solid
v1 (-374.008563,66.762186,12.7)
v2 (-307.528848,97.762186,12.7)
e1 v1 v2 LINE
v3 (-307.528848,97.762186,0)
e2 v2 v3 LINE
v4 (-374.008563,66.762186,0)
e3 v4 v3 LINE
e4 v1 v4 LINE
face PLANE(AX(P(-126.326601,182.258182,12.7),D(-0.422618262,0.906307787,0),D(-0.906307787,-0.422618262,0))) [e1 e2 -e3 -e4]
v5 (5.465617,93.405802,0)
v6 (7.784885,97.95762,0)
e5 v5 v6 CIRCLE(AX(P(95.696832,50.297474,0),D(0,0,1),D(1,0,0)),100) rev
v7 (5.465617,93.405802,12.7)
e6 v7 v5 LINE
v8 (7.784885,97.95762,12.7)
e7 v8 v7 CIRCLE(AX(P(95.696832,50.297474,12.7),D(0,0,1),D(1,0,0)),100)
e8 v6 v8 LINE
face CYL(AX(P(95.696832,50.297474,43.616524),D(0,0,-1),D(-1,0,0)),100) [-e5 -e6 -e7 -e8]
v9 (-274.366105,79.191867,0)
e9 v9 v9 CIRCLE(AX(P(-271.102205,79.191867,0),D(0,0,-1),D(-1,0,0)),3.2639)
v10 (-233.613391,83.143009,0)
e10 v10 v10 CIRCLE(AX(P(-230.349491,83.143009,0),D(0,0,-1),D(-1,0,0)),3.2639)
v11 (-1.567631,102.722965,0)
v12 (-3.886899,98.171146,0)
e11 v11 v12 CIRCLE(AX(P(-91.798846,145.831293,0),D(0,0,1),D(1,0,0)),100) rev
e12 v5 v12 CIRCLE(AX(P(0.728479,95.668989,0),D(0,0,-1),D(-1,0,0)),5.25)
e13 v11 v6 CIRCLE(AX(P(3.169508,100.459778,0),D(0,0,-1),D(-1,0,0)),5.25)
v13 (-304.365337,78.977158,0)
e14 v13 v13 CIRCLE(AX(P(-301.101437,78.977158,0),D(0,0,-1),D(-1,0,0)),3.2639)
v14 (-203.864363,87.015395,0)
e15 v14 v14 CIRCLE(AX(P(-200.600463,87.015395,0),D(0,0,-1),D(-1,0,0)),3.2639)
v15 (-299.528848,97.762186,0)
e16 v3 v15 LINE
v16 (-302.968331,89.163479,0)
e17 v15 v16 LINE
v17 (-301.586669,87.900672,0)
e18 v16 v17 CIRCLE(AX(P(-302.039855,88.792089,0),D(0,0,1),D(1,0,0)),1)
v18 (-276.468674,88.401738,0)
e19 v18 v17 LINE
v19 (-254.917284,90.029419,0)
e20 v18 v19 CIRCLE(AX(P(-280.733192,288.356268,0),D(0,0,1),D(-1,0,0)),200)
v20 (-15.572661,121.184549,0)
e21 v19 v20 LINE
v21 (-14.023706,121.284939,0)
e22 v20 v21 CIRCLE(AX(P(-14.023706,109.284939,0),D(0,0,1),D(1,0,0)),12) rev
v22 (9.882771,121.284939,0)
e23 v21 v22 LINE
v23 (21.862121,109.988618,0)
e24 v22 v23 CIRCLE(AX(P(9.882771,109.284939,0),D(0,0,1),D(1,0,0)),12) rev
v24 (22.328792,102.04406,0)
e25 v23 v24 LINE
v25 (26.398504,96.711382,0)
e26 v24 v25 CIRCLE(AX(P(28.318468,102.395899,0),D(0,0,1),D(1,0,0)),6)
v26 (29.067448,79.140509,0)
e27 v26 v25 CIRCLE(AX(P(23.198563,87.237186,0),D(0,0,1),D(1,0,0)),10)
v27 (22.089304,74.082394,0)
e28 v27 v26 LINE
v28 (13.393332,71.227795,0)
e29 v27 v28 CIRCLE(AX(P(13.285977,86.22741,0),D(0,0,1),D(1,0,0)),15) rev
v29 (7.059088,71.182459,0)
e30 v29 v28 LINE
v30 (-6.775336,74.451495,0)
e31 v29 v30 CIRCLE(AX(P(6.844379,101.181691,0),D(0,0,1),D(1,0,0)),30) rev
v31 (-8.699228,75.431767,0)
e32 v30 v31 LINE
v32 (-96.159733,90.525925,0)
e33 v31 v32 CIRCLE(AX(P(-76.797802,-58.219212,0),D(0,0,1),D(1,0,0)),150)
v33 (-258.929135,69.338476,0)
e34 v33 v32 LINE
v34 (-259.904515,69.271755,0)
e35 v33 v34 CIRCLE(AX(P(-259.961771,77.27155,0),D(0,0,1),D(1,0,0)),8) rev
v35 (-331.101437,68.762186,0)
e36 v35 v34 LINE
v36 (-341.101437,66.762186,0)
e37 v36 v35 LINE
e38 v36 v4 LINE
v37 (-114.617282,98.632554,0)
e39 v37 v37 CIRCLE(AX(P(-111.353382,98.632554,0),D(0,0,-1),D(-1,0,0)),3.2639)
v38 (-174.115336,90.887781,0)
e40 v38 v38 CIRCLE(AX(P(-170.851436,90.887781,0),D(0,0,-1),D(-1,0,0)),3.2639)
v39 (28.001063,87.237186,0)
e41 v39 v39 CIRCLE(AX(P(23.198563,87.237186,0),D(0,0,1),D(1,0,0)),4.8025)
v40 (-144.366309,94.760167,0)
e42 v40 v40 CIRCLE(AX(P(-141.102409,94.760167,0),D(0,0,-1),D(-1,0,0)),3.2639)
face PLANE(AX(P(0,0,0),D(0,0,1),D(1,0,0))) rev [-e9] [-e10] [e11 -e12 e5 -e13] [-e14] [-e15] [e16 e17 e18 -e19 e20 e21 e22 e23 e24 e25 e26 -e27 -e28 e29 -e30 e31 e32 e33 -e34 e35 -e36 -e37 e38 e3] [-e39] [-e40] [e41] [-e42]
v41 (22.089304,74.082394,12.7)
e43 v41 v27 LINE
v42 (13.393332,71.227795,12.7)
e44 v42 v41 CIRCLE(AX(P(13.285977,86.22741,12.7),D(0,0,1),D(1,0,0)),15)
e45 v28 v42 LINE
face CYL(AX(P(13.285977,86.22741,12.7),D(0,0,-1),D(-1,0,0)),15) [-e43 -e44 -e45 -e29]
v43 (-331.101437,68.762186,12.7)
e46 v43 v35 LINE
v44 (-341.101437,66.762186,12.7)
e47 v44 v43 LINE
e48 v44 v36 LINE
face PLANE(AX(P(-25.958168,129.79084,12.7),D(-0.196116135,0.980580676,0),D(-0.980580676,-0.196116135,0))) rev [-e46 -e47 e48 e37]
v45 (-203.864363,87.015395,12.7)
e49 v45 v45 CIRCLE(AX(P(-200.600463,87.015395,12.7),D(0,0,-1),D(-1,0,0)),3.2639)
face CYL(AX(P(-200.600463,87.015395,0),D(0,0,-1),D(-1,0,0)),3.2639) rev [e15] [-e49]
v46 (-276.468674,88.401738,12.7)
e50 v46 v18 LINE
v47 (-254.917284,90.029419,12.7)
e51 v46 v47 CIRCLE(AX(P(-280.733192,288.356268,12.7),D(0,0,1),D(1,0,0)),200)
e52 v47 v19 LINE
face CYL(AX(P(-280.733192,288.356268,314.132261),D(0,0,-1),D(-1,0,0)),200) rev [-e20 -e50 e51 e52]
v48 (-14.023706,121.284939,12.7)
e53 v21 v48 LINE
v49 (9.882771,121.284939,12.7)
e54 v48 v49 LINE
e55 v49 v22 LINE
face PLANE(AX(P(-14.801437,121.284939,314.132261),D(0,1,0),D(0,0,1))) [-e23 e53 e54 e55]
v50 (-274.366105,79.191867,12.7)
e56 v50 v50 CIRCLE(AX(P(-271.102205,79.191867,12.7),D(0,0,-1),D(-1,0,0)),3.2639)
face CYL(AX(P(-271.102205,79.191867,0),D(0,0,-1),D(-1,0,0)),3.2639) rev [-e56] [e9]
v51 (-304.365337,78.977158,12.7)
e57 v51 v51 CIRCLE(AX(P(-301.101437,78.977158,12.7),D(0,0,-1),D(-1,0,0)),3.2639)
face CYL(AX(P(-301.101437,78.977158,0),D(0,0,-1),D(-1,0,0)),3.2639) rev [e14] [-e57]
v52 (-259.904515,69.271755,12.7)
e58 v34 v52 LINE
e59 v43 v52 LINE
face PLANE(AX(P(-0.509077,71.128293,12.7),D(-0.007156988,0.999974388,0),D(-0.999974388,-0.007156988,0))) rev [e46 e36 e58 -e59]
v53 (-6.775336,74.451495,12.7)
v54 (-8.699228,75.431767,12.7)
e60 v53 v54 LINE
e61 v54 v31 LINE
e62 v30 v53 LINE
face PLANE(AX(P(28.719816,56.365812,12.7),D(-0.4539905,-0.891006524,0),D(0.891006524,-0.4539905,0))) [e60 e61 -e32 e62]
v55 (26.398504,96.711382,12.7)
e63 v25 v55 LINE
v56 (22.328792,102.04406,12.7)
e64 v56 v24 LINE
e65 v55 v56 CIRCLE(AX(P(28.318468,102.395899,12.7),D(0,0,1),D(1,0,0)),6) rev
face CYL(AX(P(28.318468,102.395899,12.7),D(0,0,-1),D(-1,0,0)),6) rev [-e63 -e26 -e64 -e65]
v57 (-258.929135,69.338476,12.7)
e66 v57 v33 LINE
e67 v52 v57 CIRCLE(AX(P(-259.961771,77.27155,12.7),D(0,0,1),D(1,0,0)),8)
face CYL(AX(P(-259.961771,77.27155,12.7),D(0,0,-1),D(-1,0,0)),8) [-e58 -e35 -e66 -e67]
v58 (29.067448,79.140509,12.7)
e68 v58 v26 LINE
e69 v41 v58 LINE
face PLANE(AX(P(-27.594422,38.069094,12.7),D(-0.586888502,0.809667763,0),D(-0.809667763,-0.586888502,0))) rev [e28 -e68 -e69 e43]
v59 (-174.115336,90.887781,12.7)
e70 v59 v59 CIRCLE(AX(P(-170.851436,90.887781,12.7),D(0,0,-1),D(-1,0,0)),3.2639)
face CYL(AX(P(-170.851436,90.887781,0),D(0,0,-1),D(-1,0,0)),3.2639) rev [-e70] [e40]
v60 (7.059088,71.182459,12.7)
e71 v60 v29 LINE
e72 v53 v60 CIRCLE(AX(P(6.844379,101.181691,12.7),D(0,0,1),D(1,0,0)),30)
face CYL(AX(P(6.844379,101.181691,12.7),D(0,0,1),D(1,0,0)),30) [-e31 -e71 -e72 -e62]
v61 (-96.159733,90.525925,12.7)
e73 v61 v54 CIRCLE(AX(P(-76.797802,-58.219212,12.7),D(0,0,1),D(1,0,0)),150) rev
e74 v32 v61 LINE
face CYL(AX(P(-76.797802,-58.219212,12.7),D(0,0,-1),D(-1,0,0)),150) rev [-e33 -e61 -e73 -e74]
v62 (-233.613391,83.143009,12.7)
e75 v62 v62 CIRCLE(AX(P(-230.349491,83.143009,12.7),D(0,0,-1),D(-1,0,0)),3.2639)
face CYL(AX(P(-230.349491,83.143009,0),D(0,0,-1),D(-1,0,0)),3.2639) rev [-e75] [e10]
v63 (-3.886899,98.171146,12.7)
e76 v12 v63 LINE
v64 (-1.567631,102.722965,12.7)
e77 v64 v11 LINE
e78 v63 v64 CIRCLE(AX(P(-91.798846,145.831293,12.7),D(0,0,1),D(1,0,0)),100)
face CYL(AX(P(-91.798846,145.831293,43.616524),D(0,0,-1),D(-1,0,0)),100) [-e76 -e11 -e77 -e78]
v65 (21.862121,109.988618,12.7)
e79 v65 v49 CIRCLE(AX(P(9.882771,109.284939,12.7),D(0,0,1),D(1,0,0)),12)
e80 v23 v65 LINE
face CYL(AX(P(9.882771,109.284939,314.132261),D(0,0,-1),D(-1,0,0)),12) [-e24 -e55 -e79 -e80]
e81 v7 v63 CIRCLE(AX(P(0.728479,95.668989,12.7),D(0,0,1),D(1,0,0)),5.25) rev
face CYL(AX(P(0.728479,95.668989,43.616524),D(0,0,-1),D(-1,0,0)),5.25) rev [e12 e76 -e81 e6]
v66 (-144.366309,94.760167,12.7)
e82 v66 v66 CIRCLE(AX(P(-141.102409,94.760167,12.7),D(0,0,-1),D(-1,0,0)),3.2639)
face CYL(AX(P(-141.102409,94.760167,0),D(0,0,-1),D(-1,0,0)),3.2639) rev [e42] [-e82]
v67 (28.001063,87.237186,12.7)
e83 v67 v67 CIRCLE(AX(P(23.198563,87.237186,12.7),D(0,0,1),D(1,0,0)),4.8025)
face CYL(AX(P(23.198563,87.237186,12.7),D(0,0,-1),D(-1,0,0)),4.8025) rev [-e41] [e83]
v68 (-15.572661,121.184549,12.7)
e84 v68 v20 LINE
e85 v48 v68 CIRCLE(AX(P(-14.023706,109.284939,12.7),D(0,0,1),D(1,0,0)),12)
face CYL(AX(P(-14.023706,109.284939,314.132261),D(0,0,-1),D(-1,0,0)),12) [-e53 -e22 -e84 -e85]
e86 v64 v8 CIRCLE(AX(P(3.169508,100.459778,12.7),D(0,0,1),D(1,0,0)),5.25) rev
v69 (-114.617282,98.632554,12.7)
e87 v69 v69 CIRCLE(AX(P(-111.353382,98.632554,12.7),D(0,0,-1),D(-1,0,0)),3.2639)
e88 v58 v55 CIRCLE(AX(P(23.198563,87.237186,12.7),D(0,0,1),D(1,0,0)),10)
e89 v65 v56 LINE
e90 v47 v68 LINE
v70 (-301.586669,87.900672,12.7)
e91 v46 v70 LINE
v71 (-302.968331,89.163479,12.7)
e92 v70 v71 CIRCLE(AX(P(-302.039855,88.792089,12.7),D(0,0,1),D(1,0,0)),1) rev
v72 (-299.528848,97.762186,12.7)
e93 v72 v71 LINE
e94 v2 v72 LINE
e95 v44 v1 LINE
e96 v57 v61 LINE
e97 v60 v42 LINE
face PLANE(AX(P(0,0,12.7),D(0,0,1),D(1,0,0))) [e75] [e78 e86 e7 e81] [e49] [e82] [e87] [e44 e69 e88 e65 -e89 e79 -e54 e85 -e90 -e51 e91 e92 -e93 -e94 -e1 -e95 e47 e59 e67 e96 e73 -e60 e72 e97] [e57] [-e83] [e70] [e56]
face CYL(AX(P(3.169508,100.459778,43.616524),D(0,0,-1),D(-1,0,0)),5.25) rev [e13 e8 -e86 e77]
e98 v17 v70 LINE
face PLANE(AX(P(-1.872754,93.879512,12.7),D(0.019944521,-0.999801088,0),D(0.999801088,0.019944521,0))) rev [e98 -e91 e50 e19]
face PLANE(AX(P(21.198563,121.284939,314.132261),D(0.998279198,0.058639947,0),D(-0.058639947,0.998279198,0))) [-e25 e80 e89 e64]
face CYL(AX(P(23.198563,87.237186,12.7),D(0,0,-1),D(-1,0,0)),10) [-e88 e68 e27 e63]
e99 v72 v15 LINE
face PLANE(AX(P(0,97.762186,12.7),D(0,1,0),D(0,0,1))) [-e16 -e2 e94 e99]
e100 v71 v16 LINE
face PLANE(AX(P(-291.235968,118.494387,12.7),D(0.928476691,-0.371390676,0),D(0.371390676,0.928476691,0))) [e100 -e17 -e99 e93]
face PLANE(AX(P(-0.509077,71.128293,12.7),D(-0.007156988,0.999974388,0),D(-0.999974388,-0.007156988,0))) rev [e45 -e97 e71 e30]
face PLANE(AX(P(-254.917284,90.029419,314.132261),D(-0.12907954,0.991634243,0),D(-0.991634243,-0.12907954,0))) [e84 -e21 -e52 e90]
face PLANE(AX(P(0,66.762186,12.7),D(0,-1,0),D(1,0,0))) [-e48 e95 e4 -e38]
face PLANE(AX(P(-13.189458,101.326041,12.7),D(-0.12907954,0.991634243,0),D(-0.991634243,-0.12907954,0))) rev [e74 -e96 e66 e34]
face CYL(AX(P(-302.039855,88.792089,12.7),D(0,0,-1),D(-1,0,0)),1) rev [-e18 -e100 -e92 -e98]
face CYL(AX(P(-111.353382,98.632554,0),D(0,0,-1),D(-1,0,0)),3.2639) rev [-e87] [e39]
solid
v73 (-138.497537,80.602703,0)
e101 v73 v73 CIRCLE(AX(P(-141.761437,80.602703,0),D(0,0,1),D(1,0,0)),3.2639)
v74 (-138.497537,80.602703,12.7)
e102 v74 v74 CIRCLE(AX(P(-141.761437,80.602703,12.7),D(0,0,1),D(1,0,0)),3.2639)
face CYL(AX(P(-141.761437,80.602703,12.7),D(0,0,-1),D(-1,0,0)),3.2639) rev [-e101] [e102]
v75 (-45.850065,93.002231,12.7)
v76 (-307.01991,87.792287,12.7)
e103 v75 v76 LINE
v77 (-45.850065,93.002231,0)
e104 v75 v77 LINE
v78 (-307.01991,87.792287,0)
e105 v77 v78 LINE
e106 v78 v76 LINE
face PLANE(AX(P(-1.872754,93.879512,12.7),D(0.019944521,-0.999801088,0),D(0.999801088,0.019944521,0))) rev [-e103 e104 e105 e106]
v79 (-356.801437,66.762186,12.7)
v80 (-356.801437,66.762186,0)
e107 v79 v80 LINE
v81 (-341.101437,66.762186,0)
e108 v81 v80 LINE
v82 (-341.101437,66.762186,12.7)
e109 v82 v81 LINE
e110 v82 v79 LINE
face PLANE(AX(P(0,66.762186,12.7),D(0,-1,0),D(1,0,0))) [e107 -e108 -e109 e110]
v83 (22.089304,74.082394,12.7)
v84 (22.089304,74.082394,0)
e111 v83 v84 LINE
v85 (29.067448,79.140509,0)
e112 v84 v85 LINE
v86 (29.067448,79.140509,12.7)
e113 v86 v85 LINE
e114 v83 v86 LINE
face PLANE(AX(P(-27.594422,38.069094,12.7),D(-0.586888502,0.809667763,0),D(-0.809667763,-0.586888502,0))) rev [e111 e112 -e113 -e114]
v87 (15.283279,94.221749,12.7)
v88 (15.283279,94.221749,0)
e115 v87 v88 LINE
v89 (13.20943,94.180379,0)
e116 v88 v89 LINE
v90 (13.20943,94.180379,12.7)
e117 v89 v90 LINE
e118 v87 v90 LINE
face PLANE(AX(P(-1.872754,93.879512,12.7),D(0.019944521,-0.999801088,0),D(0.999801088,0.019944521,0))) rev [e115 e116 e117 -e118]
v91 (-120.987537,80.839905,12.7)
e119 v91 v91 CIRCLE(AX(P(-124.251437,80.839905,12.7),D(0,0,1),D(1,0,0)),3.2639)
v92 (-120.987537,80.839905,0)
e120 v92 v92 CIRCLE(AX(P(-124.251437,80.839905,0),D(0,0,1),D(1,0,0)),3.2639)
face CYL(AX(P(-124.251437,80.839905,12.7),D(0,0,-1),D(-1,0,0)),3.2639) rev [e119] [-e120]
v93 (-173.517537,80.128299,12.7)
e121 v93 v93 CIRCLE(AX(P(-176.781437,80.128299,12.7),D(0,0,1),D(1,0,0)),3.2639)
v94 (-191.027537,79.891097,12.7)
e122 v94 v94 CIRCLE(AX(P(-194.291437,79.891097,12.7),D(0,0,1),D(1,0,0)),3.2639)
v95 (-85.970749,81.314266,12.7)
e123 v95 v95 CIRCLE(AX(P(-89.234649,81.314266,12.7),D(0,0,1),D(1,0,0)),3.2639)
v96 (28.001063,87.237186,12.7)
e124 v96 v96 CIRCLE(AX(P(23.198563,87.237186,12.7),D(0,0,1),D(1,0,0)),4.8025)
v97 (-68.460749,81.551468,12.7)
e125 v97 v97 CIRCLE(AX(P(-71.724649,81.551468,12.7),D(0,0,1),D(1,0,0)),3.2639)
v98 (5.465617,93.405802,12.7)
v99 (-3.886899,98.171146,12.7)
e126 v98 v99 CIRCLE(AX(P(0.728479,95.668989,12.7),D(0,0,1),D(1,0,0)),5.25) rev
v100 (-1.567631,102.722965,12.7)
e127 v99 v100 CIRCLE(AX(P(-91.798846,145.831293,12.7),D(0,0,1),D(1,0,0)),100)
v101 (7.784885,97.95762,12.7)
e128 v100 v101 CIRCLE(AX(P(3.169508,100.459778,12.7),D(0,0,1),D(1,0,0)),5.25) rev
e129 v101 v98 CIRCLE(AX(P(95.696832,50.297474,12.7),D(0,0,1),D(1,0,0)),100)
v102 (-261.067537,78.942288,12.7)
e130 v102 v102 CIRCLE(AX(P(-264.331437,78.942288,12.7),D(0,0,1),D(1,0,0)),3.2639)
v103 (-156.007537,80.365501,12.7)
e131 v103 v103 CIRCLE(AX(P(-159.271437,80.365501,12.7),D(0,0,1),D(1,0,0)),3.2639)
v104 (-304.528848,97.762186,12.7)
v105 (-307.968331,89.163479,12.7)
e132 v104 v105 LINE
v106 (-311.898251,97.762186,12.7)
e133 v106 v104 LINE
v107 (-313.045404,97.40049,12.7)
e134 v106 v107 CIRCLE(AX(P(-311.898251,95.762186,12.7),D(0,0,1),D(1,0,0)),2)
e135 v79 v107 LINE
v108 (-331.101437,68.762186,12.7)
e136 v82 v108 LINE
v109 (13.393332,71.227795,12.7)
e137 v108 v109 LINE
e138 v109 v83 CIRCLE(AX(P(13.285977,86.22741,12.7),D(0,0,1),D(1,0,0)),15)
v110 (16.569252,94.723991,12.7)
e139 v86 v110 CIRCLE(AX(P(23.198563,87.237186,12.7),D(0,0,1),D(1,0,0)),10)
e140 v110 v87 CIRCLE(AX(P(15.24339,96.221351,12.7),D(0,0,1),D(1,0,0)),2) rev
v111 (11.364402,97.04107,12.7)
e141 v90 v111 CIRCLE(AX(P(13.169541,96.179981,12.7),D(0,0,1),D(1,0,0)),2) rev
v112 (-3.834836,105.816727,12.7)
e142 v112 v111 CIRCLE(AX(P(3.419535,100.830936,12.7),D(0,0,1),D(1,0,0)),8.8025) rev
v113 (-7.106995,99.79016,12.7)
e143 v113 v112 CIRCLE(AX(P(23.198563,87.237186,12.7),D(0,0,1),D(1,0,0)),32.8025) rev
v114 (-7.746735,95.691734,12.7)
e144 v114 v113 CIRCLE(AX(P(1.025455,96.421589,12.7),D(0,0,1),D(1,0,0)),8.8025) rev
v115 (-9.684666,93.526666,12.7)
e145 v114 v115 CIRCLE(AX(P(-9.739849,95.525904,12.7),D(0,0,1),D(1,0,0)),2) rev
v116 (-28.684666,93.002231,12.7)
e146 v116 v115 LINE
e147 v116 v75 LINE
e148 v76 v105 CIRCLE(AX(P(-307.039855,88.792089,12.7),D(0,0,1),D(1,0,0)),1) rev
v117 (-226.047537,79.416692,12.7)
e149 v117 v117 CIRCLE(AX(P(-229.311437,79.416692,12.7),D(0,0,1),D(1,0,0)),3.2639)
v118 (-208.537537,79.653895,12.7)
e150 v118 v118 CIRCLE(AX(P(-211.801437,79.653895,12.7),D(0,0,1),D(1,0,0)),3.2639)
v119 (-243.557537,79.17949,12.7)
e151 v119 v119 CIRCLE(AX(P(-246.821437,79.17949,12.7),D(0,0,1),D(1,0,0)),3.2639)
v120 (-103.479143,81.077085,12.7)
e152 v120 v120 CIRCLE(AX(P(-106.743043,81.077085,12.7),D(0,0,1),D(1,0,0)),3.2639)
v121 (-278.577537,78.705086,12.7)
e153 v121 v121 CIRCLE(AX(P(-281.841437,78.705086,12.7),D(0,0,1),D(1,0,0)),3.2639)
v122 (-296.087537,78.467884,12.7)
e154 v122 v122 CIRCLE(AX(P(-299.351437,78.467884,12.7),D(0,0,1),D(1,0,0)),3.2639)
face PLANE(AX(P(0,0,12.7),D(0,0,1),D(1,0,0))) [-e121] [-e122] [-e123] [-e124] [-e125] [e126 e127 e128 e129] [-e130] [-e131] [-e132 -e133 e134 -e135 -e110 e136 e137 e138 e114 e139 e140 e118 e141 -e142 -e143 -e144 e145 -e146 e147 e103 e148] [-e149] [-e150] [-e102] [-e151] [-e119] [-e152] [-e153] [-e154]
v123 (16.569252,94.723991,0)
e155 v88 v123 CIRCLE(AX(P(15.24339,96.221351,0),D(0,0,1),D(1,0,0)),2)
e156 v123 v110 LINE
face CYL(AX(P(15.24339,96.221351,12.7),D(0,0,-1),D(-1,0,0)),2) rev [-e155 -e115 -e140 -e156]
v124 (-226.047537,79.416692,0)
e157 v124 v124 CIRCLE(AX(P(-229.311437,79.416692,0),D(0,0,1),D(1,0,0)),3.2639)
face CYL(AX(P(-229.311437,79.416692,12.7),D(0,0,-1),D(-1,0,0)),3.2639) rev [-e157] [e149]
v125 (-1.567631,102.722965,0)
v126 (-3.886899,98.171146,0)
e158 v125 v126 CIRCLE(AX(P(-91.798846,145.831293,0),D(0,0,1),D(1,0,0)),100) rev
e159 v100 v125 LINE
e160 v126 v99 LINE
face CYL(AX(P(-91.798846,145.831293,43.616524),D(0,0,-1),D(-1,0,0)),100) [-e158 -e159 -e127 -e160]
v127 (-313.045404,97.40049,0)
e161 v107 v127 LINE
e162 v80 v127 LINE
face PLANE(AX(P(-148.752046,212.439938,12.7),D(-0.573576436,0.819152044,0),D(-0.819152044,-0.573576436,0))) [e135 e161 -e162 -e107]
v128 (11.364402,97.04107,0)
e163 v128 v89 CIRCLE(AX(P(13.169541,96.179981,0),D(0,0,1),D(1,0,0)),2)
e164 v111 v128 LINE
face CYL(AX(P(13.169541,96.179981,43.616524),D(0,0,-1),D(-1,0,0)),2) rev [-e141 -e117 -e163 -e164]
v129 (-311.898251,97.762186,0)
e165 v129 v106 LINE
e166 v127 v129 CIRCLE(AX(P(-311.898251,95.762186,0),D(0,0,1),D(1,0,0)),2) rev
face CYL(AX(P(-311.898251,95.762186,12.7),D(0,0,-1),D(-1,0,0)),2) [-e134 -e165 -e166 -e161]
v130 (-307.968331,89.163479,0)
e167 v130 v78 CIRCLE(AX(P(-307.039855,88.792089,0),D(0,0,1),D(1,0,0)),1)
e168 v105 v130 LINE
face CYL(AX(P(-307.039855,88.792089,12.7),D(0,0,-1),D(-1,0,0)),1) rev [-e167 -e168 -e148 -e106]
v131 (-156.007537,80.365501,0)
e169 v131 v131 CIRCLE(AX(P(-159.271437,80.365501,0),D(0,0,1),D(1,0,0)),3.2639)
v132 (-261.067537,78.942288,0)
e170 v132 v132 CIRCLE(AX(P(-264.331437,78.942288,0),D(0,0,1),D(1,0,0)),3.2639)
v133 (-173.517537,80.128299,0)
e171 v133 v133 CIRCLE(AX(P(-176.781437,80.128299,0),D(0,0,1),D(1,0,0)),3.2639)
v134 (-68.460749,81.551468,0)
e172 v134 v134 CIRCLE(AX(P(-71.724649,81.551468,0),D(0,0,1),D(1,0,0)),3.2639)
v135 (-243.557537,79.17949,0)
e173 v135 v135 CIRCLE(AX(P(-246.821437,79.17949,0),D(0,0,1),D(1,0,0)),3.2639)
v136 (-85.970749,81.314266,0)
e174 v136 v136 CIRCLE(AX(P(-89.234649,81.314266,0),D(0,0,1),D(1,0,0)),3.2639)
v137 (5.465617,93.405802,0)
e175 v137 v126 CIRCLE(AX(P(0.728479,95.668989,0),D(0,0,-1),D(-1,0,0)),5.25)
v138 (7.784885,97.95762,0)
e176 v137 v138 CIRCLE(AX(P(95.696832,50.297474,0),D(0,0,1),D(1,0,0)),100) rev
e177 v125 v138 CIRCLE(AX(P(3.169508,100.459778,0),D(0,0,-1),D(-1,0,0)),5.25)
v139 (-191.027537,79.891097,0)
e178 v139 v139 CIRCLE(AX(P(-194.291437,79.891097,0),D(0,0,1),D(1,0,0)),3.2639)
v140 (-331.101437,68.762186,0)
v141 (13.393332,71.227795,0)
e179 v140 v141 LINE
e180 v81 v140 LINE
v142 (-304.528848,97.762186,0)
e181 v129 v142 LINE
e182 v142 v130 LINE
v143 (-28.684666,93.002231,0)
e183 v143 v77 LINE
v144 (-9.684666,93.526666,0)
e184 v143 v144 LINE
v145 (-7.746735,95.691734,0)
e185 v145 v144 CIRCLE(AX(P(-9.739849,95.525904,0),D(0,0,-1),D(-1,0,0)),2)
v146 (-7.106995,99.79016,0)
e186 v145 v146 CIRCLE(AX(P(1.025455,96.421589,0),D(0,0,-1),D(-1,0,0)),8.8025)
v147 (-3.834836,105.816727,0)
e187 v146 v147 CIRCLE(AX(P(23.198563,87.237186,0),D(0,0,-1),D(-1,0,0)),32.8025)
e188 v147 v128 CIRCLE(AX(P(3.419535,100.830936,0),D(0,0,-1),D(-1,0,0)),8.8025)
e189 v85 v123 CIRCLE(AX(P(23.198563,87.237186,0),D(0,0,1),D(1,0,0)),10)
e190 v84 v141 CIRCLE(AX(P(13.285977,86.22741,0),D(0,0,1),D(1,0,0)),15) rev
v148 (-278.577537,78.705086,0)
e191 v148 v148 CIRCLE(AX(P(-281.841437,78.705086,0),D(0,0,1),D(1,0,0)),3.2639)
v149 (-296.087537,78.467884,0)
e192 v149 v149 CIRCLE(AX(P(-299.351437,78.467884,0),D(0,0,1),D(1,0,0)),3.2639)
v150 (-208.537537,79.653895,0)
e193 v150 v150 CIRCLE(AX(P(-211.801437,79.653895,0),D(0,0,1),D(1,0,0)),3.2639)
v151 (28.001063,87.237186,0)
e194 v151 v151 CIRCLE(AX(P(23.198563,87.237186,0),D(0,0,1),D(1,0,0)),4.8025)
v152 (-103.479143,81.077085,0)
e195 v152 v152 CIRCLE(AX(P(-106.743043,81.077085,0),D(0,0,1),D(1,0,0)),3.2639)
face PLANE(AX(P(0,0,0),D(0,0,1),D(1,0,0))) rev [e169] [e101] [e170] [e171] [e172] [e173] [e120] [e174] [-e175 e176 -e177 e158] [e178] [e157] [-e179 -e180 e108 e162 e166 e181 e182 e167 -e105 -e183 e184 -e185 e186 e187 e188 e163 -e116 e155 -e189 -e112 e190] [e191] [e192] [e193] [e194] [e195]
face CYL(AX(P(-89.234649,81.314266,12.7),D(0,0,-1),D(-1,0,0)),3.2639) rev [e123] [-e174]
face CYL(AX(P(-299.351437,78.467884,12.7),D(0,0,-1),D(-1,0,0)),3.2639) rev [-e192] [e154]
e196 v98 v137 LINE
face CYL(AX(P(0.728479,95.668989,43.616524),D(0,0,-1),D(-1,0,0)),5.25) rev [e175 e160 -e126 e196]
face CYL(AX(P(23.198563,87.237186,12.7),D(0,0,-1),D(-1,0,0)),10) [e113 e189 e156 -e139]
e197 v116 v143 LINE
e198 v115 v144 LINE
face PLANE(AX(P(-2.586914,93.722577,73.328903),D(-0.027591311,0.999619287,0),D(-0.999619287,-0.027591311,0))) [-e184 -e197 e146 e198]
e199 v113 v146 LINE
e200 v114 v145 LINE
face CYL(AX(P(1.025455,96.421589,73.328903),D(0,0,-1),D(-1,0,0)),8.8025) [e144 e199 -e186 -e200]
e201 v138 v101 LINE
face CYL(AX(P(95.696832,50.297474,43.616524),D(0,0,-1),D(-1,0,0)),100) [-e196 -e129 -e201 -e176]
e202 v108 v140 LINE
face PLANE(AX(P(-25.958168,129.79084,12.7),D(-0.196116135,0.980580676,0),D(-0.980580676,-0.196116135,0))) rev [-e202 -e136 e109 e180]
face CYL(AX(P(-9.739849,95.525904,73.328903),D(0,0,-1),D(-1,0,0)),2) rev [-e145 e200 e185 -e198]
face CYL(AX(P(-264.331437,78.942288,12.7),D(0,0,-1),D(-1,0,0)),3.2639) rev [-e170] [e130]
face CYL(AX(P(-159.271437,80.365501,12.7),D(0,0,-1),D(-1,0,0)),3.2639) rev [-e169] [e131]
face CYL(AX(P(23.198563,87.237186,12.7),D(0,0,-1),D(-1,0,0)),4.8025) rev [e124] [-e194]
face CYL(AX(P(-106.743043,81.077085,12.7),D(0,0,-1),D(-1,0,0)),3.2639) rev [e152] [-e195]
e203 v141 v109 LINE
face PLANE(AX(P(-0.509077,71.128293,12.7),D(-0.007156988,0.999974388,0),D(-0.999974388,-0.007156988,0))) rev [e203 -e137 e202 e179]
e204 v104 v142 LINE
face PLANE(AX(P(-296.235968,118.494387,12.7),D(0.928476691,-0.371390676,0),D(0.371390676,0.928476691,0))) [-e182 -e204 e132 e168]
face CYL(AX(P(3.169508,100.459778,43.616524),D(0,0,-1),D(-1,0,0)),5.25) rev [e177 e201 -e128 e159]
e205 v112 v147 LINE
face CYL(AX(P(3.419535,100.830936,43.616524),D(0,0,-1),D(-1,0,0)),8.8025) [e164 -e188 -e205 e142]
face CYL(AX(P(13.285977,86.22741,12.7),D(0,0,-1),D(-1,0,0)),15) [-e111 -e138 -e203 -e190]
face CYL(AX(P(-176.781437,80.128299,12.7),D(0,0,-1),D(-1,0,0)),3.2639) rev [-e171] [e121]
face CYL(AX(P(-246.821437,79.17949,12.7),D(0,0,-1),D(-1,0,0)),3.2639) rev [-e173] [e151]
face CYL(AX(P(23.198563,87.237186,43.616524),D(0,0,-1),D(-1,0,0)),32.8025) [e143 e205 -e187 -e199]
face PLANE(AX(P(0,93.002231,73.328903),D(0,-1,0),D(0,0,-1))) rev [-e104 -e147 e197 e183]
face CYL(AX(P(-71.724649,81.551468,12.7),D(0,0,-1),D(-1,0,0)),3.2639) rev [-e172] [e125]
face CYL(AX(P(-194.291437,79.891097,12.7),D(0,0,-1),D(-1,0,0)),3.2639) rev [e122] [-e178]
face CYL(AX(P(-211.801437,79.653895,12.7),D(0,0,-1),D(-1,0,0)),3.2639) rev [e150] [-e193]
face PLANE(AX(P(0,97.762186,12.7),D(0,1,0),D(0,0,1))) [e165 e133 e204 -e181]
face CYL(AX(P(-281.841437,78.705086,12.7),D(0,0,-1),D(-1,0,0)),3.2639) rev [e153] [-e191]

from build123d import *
from build123d.topology import SkipClean

# Parameters (mm, degrees)
SKETCH1_R                        = 3.2639
SKETCH1_R_2                      = 4.8025
BOSS_EXTRUDE1_DEPTH              = 12.7
EXTRUDE_THIN1_DEPTH              = 12.7
FILLET6_R                        = 2
FILLET3_R                        = 1
FILLET4_R                        = 2
BOSS_EXTRUDE5_START              = -12.7
BOSS_EXTRUDE5_DEPTH              = 12.7
CUT_EXTRUDE8_START               = -12.7
CUT_EXTRUDE8_DEPTH               = 12.7
FILLET13_R                       = 100
FILLET14_R                       = 2
CUT_EXTRUDE10_DEPTH              = 12.7
SKETCH19_R                       = 3.2639
BOSS_EXTRUDE7_DEPTH              = 6.35
FILLET17_R                       = 10
FILLET18_R                       = 5
CUT_EXTRUDE11_DEPTH              = 405.745522146
FILLET19_R                       = 5
DELETEFACE2_DEPTH                = 12.7
FILLET20_R                       = 15
BODY_MOVE_COPY1_OUTLINE_R        = 3.2639
BODY_MOVE_COPY1_OUTLINE_R_2      = 4.8025
BODY_MOVE_COPY1_DEPTH            = 12.7
BOSS_EXTRUDE8_DEPTH              = 12.7
FILLET21_R                       = 6
DELETEFACE3_OUTLINE_R            = 3.2639
DELETEFACE3_DEPTH                = 12.7
CUT_EXTRUDE12_DEPTH              = 378.065765561
FILLET22_R                       = 150
FILLET22_R_2                     = 30
FILLET22_R_3                     = 8
DELETEFACE4_DEPTH                = 12.7
MOVE_FACE1_DEPTH                 = 12.7
MOVE_FACE2_DEPTH                 = 12.7
MOVE_FACE2_2_DEPTH               = 12.7
FILLET23_R                       = 12
SKETCH25_W                       = 3.2639
SKETCH25_H                       = 12.7
F_1_4_CLEARANCE_HOLE1_AT_2_COUNT = 2
F_1_4_CLEARANCE_HOLE1_AT_2_PITCH = 40.943805732
F_1_4_CLEARANCE_HOLE1_AT_3_COUNT = 2
F_1_4_CLEARANCE_HOLE1_AT_3_PITCH = 70.874481639
F_1_4_CLEARANCE_HOLE1_AT_4_COUNT = 2
F_1_4_CLEARANCE_HOLE1_AT_4_PITCH = 120
F_1_4_CLEARANCE_HOLE1_AT_5_COUNT = 2
F_1_4_CLEARANCE_HOLE1_AT_5_PITCH = 90
F_1_4_CLEARANCE_HOLE1_AT_6_COUNT = 2
F_1_4_CLEARANCE_HOLE1_AT_6_PITCH = 60
F_1_4_CLEARANCE_HOLE1_AT_7_COUNT = 2
F_1_4_CLEARANCE_HOLE1_AT_7_PITCH = 30


# Read off the part's stored shape, not the designer's step: DeleteFace2, Body-Move/Copy1, DeleteFace3, DeleteFace4, Move Face1, Move Face2
with BuildPart() as part:
    # Sketch1 → Boss-Extrude1 (new body)
    with BuildSketch(Plane.XY):
        with BuildLine():
            Line((-356.801436578, 66.762186411), (-341.101436578, 66.762186411))
            Line((-341.101436578, 66.762186411), (-331.101436578, 68.762186411))
            Line((-331.101436578, 68.762186411), (18.198563422, 71.262186411))
            Line((18.198563422, 71.262186411), (29.067448443, 79.140508783))
            ThreePointArc((29.067448443, 79.140508783), (30.773671377, 93.765412775), (16.057134994, 94.237186411))
            Line((16.057134994, 94.237186411), (-308.528848369, 87.762186411))
            Line((-308.528848369, 87.762186411), (-304.528848369, 97.762186411))
            Line((-304.528848369, 97.762186411), (-312.528848369, 97.762186411))
            Line((-312.528848369, 97.762186411), (-356.801436578, 66.762186411))
        make_face()
        with Locations((-299.351436578, 78.467884124)):
            Circle(SKETCH1_R, mode=Mode.SUBTRACT)
        with Locations((-281.841436578, 78.705086211)):
            Circle(SKETCH1_R, mode=Mode.SUBTRACT)
        with Locations((-264.331436578, 78.942288297)):
            Circle(SKETCH1_R, mode=Mode.SUBTRACT)
        with Locations((-246.821436578, 79.179490384)):
            Circle(SKETCH1_R, mode=Mode.SUBTRACT)
        with Locations((-229.311436578, 79.41669247)):
            Circle(SKETCH1_R, mode=Mode.SUBTRACT)
        with Locations((-211.801436578, 79.653894557)):
            Circle(SKETCH1_R, mode=Mode.SUBTRACT)
        with BuildLine():
            ThreePointArc((-197.555037136, 79.846885743), (-194.335647478, 83.154697202), (-191.027836019, 79.935307544))
            ThreePointArc((-191.027836019, 79.935307544), (-194.247225677, 76.627496085), (-197.555037136, 79.846885743))
        make_face(mode=Mode.SUBTRACT)
        with BuildLine():
            ThreePointArc((-180.045037136, 80.08408783), (-176.825647478, 83.391899289), (-173.517836019, 80.17250963))
            ThreePointArc((-173.517836019, 80.17250963), (-176.737225677, 76.864698172), (-180.045037136, 80.08408783))
        make_face(mode=Mode.SUBTRACT)
        with BuildLine():
            ThreePointArc((-162.535037136, 80.321289917), (-159.315647478, 83.629101376), (-156.007836019, 80.409711717))
            ThreePointArc((-156.007836019, 80.409711717), (-159.227225677, 77.101900258), (-162.535037136, 80.321289917))
        make_face(mode=Mode.SUBTRACT)
        with BuildLine():
            ThreePointArc((-145.025037136, 80.558492003), (-141.805647478, 83.866303462), (-138.497836019, 80.646913804))
            ThreePointArc((-138.497836019, 80.646913804), (-141.717225677, 77.339102345), (-145.025037136, 80.558492003))
        make_face(mode=Mode.SUBTRACT)
        with Locations((-124.251436578, 80.83990499)):
            Circle(SKETCH1_R, mode=Mode.SUBTRACT)
        with Locations((-106.743043005, 81.077085315)):
            Circle(SKETCH1_R, mode=Mode.SUBTRACT)
        with Locations((-89.234649432, 81.31426564)):
            Circle(SKETCH1_R, mode=Mode.SUBTRACT)
        with Locations((-71.724649432, 81.551467727)):
            Circle(SKETCH1_R, mode=Mode.SUBTRACT)
        with BuildLine():
            ThreePointArc((-56.765451624, 76.725809773), (-61.828921392, 81.685493615), (-56.901716563, 86.780573837))
            Line((-56.901716563, 86.780573837), (11.656240235, 88.148201501))
            Line((11.656240235, 88.148201501), (15.713451777, 77.244553714))
            Line((15.713451777, 77.244553714), (-56.765451624, 76.725809773))
        make_face(mode=Mode.SUBTRACT)
        with Locations((23.198563422, 87.237186411)):
            Circle(SKETCH1_R_2, mode=Mode.SUBTRACT)
    extrude(amount=BOSS_EXTRUDE1_DEPTH)

    # Sketch3 → Extrude-Thin1 (add)
    with BuildSketch(Plane.XY.offset(12.7)):
        Polygon((4.266451459, 91.146855042), (3.251292658, 89.42364507), (-3.17085029, 78.522197177), (-4.186009091, 76.798987205), (0.552818334, 74.007300502), (1.567977134, 75.730510475), (7.990120082, 86.631958367), (9.005278883, 88.35516834), align=None)
        Polygon((-7.409121997, 76.81721423), (-8.469584737, 78.512920212), (-15.045003552, 89.027176482), (-16.105466292, 90.722882464), (-20.768657742, 87.806609928), (-19.708195001, 86.110903946), (-13.132776187, 75.596647676), (-12.072313446, 73.900941694), align=None)
        Polygon((-55.76358933, 87.210989988), (-54.70312659, 85.515284006), (-48.127707775, 75.001027736), (-47.067245035, 73.305321754), (-42.404053585, 76.22159429), (-43.464516326, 77.917300272), (-50.03993514, 88.431556542), (-51.100397881, 90.127262523), align=None)
        Polygon((-30.72848013, 90.551235102), (-31.743638931, 88.828025129), (-38.165781878, 77.926577237), (-39.180940679, 76.203367264), (-34.442113255, 73.411680562), (-33.426954454, 75.134890534), (-27.004811507, 86.036338427), (-25.989652706, 87.759548399), align=None)
    extrude(amount=-EXTRUDE_THIN1_DEPTH)

    # Fillet6
    fillet6_edges = [part.edges().sort_by_distance(p)[0] for p in [
        (-4.006668809, 77.103413429, 6.35),
        (2.391033949, 87.963374633, 6.35),
        (2.403795654, 77.149294223, 6.35),
        (8.850378791, 88.092228804, 6.35),
        (-14.030214252, 77.031673195, 6.35),
        (-20.580120846, 87.505134799, 6.35),
        (-7.572146672, 77.077894693, 6.35),
        (-14.173077707, 87.63294563, 6.35),
        (-38.797405337, 76.854410162, 6.35),
        (-32.664985126, 87.264060013, 6.35),
        (-32.386940873, 76.900290955, 6.35),
        (-26.205640285, 87.392914184, 6.35),
        (-49.240037595, 76.779670452, 6.35),
        (-55.511755473, 86.808301461, 6.35),
        (-42.781970016, 76.825891949, 6.35),
        (-49.104712334, 86.936112292, 6.35),
        (15.713451777, 77.244553714, 6.35),
        (11.656240235, 88.148201501, 6.35),
    ]]
    fillet(fillet6_edges, radius=FILLET6_R)

    # Fillet3
    fillet3_edges = [part.edges().sort_by_distance(p)[0] for p in [
        (-308.528848369, 87.762186411, 6.35),
    ]]
    fillet(fillet3_edges, radius=FILLET3_R)

    # Fillet4
    fillet4_edges = [part.edges().sort_by_distance(p)[0] for p in [
        (-312.528848369, 97.762186411, 6.35),
    ]]
    fillet(fillet4_edges, radius=FILLET4_R)

    # Sketch15 → Boss-Extrude5 (add)
    with BuildSketch(Plane(origin=(0, 0, 0), x_dir=(-1, 0, 0), z_dir=(0, 0, -1)).offset(BOSS_EXTRUDE5_START)):
        with BuildLine():
            ThreePointArc((-10.673905671, 95.845145196), (-10.129865813, 94.994321774), (-9.643534088, 94.109244762))
            Line((-9.643534088, 94.109244762), (-5.716381864, 94.030904008))
            ThreePointArc((-5.716381864, 94.030904008), (-5.937204944, 95.011972339), (-5.966921788, 96.01714636))
            ThreePointArc((-5.966921788, 96.01714636), (-5.552957699, 105.137562008), (2.068935542, 100.111620178))
            ThreePointArc((2.068935542, 100.111620178), (4.245314576, 97.349429423), (4.190127672, 93.833284109))
            Line((4.190127672, 93.833284109), (8.099749475, 93.755293061))
            ThreePointArc((8.099749475, 93.755293061), (8.195599303, 95.99531307), (7.722434089, 98.186885911))
            ThreePointArc((7.722434089, 98.186885911), (6.028678087, 102.129209778), (3.83483588, 105.816726997))
            ThreePointArc((3.83483588, 105.816726997), (-8.405325796, 108.085306872), (-10.673905671, 95.845145196))
        make_face()
        with BuildLine():
            ThreePointArc((1.190174188, 87.891934941), (-0.035420742, 87.502954243), (-0.770907429, 86.448227619))
            ThreePointArc((-0.770907429, 86.448227619), (1.801029811, 86.772839148), (4.166878038, 87.832554196))
            Line((4.166878038, 87.832554196), (1.190174188, 87.891934941))
        make_face()
    extrude(amount=BOSS_EXTRUDE5_DEPTH)

    # Sketch15<3> → Cut-Extrude8 (cut)
    with SkipClean():  # the faces are left unmerged after this step: merging them gives an invalid solid
        with BuildSketch(Plane(origin=(0, 0, 0), x_dir=(-1, 0, 0), z_dir=(0, 0, -1)).offset(CUT_EXTRUDE8_START)):
            with BuildLine():
                Line((4.190127672, 93.833284109), (-5.716381864, 94.030904008))
                ThreePointArc((-5.716381864, 94.030904008), (-0.833187407, 90.420033069), (4.190127672, 93.833284109))
            make_face()
        extrude(amount=CUT_EXTRUDE8_DEPTH, mode=Mode.SUBTRACT)

    # Fillet13
    fillet13_edges = [part.edges().sort_by_distance(p)[0] for p in [
        (5.966921788, 96.01714636, 6.35),
        (-2.068935542, 100.111620178, 6.35),
    ]]
    fillet(fillet13_edges, radius=FILLET13_R)

    # Fillet14
    fillet14_edges = [part.edges().sort_by_distance(p)[0] for p in [
        (16.057134994, 94.237186411, 6.35),
        (-8.099749475, 93.755293061, 6.35),
        (9.643534088, 94.109244762, 6.35),
    ]]
    fillet(fillet14_edges, radius=FILLET14_R)

    # original slant → Cut-Extrude10 (cut)
    with SkipClean():  # the faces are left unmerged after this step: merging them gives an invalid solid
        with BuildSketch(Plane(origin=(0, 0, 0), x_dir=(-1, 0, 0), z_dir=(0, 0, -1))):
            with BuildLine():
                Line((28.684666066, 98.558006822), (7.106994943, 99.790159701))
                ThreePointArc((7.106994943, 99.790159701), (7.671727903, 97.779168258), (7.746735366, 95.691733522))
                ThreePointArc((7.746735366, 95.691733522), (8.24962771, 94.192022343), (9.684666066, 93.526665861))
                Line((9.684666066, 93.526665861), (28.684666066, 93.002231288))
                Line((28.684666066, 93.002231288), (28.684666066, 98.558006822))
            make_face()
            Polygon((67.354716499, 96.349825333), (28.684666066, 98.558006822), (28.684666066, 93.002231288), (67.354716499, 93.002231288), align=None)
        extrude(amount=-CUT_EXTRUDE10_DEPTH, mode=Mode.SUBTRACT)

    # DeleteFace2 outline → DeleteFace2 (add)
    with SkipClean():  # the faces are left unmerged after this step: merging them gives an invalid solid
        with BuildSketch(Plane.XY):
            with BuildLine():
                ThreePointArc((-56.901716563, 86.780573837), (-61.828921392, 81.685493615), (-56.765451624, 76.725809773))
                Line((-56.765451624, 76.725809773), (-52.81933282, 76.754052822))
                ThreePointArc((-52.81933282, 76.754052822), (-51.080771522, 77.790970825), (-51.137940814, 79.814464339))
                Line((-51.137940814, 79.814464339), (-54.910286581, 85.846537921))
                ThreePointArc((-54.910286581, 85.846537921), (-55.654189981, 86.545072579), (-56.645881605, 86.785677358))
                Line((-56.645881605, 86.785677358), (-56.901716563, 86.780573837))
            make_face()
            with BuildLine():
                ThreePointArc((-43.374508777, 77.77337599), (-42.64183357, 77.080963456), (-41.664488819, 76.833889954))
                Line((-41.664488819, 76.833889954), (-39.930931875, 76.846297318))
                ThreePointArc((-39.930931875, 76.846297318), (-38.946646737, 77.113387241), (-38.222035879, 77.831087294))
                Line((-38.222035879, 77.831087294), (-34.483094249, 84.177859344))
                ThreePointArc((-34.483094249, 84.177859344), (-34.47986619, 86.202677357), (-36.246193264, 87.192620321))
                Line((-36.246193264, 87.192620321), (-45.579170729, 87.006441521))
                ThreePointArc((-45.579170729, 87.006441521), (-47.298279084, 85.958641926), (-47.234987668, 83.946376604))
                Line((-47.234987668, 83.946376604), (-43.374508777, 77.77337599))
            make_face()
            with BuildLine():
                ThreePointArc((-30.595835387, 79.940653539), (-30.605484269, 77.926895623), (-28.858311438, 76.925545961))
                Line((-28.858311438, 76.925545961), (-17.609509476, 77.006055566))
                ThreePointArc((-17.609509476, 77.006055566), (-15.870948178, 78.042973568), (-15.928117471, 80.066467083))
                Line((-15.928117471, 80.066467083), (-19.978651954, 86.543371259))
                ThreePointArc((-19.978651954, 86.543371259), (-20.722555354, 87.241905917), (-21.714246978, 87.482510696))
                Line((-21.714246978, 87.482510696), (-25.089143083, 87.415186617))
                ThreePointArc((-25.089143083, 87.415186617), (-26.058913252, 87.142022472), (-26.772464013, 86.430743241))
                Line((-26.772464013, 86.430743241), (-30.595835387, 79.940653539))
            make_face()
            with BuildLine():
                ThreePointArc((-8.164685434, 78.025378734), (-7.432010227, 77.3329662), (-6.454665476, 77.085892697))
                Line((-6.454665476, 77.085892697), (-5.140195348, 77.095300585))
                ThreePointArc((-5.140195348, 77.095300585), (-4.15591021, 77.362390508), (-3.431299352, 78.080090561))
                Line((-3.431299352, 78.080090561), (0.572924826, 84.877173964))
                ThreePointArc((0.572924826, 84.877173964), (0.834020748, 85.64227253), (0.770907429, 86.448227619))
                ThreePointArc((0.770907429, 86.448227619), (-1.801029811, 86.772839148), (-4.166878038, 87.832554196))
                Line((-4.166878038, 87.832554196), (-10.647536102, 87.703274859))
                ThreePointArc((-10.647536102, 87.703274859), (-12.366644457, 86.655475264), (-12.303353041, 84.643209942))
                Line((-12.303353041, 84.643209942), (-8.164685434, 78.025378734))
            make_face()
            with BuildLine():
                ThreePointArc((4.19490114, 80.189656806), (4.185252259, 78.175898891), (5.932425089, 77.174549229))
                Line((5.932425089, 77.174549229), (12.857228918, 77.224111237))
                ThreePointArc((12.857228918, 77.224111237), (14.48938723, 78.088661845), (14.717356381, 79.921533519))
                Line((14.717356381, 79.921533519), (12.151293007, 86.817760384))
                ThreePointArc((12.151293007, 86.817760384), (11.401698398, 87.773985644), (10.236962525, 88.119889055))
                Line((10.236962525, 88.119889055), (9.966875992, 88.114501237))
                ThreePointArc((9.966875992, 88.114501237), (8.997105823, 87.841337091), (8.283555062, 87.130057861))
                Line((8.283555062, 87.130057861), (4.19490114, 80.189656806))
            make_face()
        extrude(amount=DELETEFACE2_DEPTH)

    # Fillet20
    fillet20_edges = [part.edges().sort_by_distance(p)[0] for p in [
        (18.198563422, 71.262186411, 6.35),
    ]]
    fillet(fillet20_edges, radius=FILLET20_R)

    # Sketch21 → Boss-Extrude8 (add)
    with SkipClean():  # the faces are left unmerged after this step: merging them gives an invalid solid
        with BuildSketch(Plane(origin=(0, 0, 0), x_dir=(-1, 0, 0), z_dir=(0, 0, -1))):
            with BuildLine():
                Line((254.917284333, 90.029419342), (14.801436578, 121.284938536))
                Line((14.801436578, 121.284938536), (-21.198563422, 121.284938536))
                Line((-21.198563422, 121.284938536), (-22.612163948, 97.219978388))
                ThreePointArc((-22.612163948, 97.219978388), (-19.380958378, 96.47979923), (-16.569252423, 94.723990514))
                ThreePointArc((-16.569252423, 94.723990514), (-15.970975757, 94.358391515), (-15.283279266, 94.221749158))
                Line((-15.283279266, 94.221749158), (-13.209430329, 94.180379005))
                ThreePointArc((-13.209430329, 94.180379005), (-11.488793028, 95.095967671), (-11.364402404, 97.041069803))
                ThreePointArc((-11.364402404, 97.041069803), (-7.820925157, 108.454043732), (3.83483588, 105.816726997))
                ThreePointArc((3.83483588, 105.816726997), (5.628834916, 102.889186644), (7.106994943, 99.790159701))
                ThreePointArc((7.106994943, 99.790159701), (7.671727903, 97.779168258), (7.746735366, 95.691733522))
                ThreePointArc((7.746735366, 95.691733522), (8.24962771, 94.192022343), (9.684666066, 93.526665861))
                Line((9.684666066, 93.526665861), (28.684666066, 93.002231288))
                Line((28.684666066, 93.002231288), (277.019910035, 88.390742128))
                ThreePointArc((277.019910035, 88.390742128), (265.945880688, 88.903678601), (254.917284333, 90.029419342))
            make_face()
        extrude(amount=-BOSS_EXTRUDE8_DEPTH)

    # Fillet21
    fillet21_edges = [part.edges().sort_by_distance(p)[0] for p in [
        (22.612163948, 97.219978388, 6.35),
    ]]
    fillet(fillet21_edges, radius=FILLET21_R)

    # DeleteFace3 outline → DeleteFace3 (add)
    with SkipClean():  # the faces are left unmerged after this step: merging them gives an invalid solid
        with BuildSketch(Plane.XY):
            with Locations((-211.801436578, 79.653894557)):
                Circle(DELETEFACE3_OUTLINE_R)
            with Locations((-106.743043005, 81.077085315)):
                Circle(DELETEFACE3_OUTLINE_R)
            with Locations((-89.234649432, 81.31426564)):
                Circle(DELETEFACE3_OUTLINE_R)
            with Locations((-71.724649432, 81.551467727)):
                Circle(DELETEFACE3_OUTLINE_R)
            with Locations((-229.311436578, 79.41669247)):
                Circle(DELETEFACE3_OUTLINE_R)
            with Locations((-246.821436578, 79.179490384)):
                Circle(DELETEFACE3_OUTLINE_R)
            with Locations((-264.331436578, 78.942288297)):
                Circle(DELETEFACE3_OUTLINE_R)
            with Locations((-281.841436578, 78.705086211)):
                Circle(DELETEFACE3_OUTLINE_R)
            with Locations((-299.351436578, 78.467884124)):
                Circle(DELETEFACE3_OUTLINE_R)
            with Locations((-194.291436578, 79.891096644)):
                Circle(DELETEFACE3_OUTLINE_R)
            with Locations((-176.781436578, 80.12829873)):
                Circle(DELETEFACE3_OUTLINE_R)
            with Locations((-159.271436578, 80.365500817)):
                Circle(DELETEFACE3_OUTLINE_R)
            with Locations((-141.761436578, 80.602702904)):
                Circle(DELETEFACE3_OUTLINE_R)
            with Locations((-124.251436578, 80.83990499)):
                Circle(DELETEFACE3_OUTLINE_R)
        extrude(amount=DELETEFACE3_DEPTH)

    # Sketch22 → Cut-Extrude12 (cut, through all)
    with SkipClean():  # the faces are left unmerged after this step: merging them gives an invalid solid
        with BuildSketch(Plane(origin=(0, 0, 0), x_dir=(-1, 0, 0), z_dir=(0, 0, -1))):
            Polygon((259.414782612, 69.275260086), (50.092085209, 96.522481158), (0.256728678, 71.13009872), align=None)
        extrude(amount=-CUT_EXTRUDE12_DEPTH, mode=Mode.SUBTRACT)

    # Fillet22
    # the kernel refuses this fillet: 150, 30, 8 mm, written as the material it adds along each edge
    with BuildSketch(Plane(origin=(-50.092085209, 96.522481158, 0), x_dir=(0.8910065241883672, -0.45399049973954797, 0), z_dir=(0, 0, 1))) as fillet22_piece_1:
        with BuildLine():
            CenterArc((FILLET22_R * 0.309708601666, -FILLET22_R), FILLET22_R, 90, 34.416405691)
            Line((-FILLET22_R * 0.25549463608, -FILLET22_R * 0.17504830442), (0, 0))
            Line((0, 0), (FILLET22_R * 0.309708601666, 0))
        make_face()
    extrude(amount=12.7)
    # the kernel refuses this fillet: 150, 30, 8 mm, written as the material it takes off along each edge
    with BuildSketch(Plane(origin=(-0.256728678, 71.13009872, -18.290010948), x_dir=(0.9999743884321234, 0.007156988179445303, 0), z_dir=(0, 0, 1))) as fillet22_2_piece_1:
        with BuildLine():
            CenterArc((FILLET22_R_2 * 0.243866812637, FILLET22_R_2), FILLET22_R_2, 242.589931282, 27.410068718)
            Line((-FILLET22_R_2 * 0.216488982855, FILLET22_R_2 * 0.112265500526), (0, 0))
            Line((0, 0), (FILLET22_R_2 * 0.243866812637, 0))
        make_face()
    extrude(amount=49.280021896, mode=Mode.SUBTRACT)
    with BuildSketch(Plane(origin=(-259.414782612, 69.275260086, -1.224362555), x_dir=(0.9916342432612403, 0.12907953978732387, 0), z_dir=(0, 0, 1))) as fillet22_2_piece_2:
        with BuildLine():
            CenterArc((FILLET22_R_3 * 0.0612181277324, FILLET22_R_3), FILLET22_R_3, 262.993663027, 7.006336973)
            Line((-FILLET22_R_3 * 0.0607609915682, FILLET22_R_3 * 0.00746733330602), (0, 0))
            Line((0, 0), (FILLET22_R_3 * 0.0612181277324, 0))
        make_face()
    extrude(amount=15.148725109, mode=Mode.SUBTRACT)

    # DeleteFace4 outline → DeleteFace4 (add)
    with SkipClean():  # the faces are left unmerged after this step: merging them gives an invalid solid
        with BuildSketch(Plane.XY):
            with BuildLine():
                Line((-312.528848369, 97.762186411), (-313.045403664, 97.400490499))
                ThreePointArc((-313.045403664, 97.400490499), (-312.49966239, 97.669620312), (-311.898250791, 97.762186411))
                Line((-311.898250791, 97.762186411), (-312.528848369, 97.762186411))
            make_face()
        extrude(amount=DELETEFACE4_DEPTH)

    # Move Face1 outline → Move Face1 (add)
    with SkipClean():  # the faces are left unmerged after this step: merging them gives an invalid solid
        with BuildSketch(Plane.XY):
            Polygon((-312.528848369, 97.762186411), (-379.008562904, 66.762186411), (-356.801436578, 66.762186411), (-313.045403664, 97.400490499), align=None)
        extrude(amount=MOVE_FACE1_DEPTH)

    # Move Face2 outline → Move Face2 (cut)
    with SkipClean():  # the faces are left unmerged after this step: merging them gives an invalid solid
        with BuildSketch(Plane.XY):
            with BuildLine():
                Line((-301.586668861, 87.900672404), (-302.457129047, 87.883308038))
                ThreePointArc((-302.457129047, 87.883308038), (-302.019910034, 87.792287451), (-301.586668861, 87.900672404))
            make_face()
            Polygon((-374.008562904, 66.762186411), (-307.528848369, 97.762186411), (-312.528848369, 97.762186411), (-379.008562904, 66.762186411), align=None)
        extrude(amount=MOVE_FACE2_DEPTH, mode=Mode.SUBTRACT)

    # Move Face2 2 outline → Move Face2 2 (add)
    with SkipClean():  # the faces are left unmerged after this step: merging them gives an invalid solid
        with BuildSketch(Plane.XY):
            with BuildLine():
                ThreePointArc((-302.457129047, 87.883308038), (-302.968547789, 88.421239677), (-302.968331247, 89.163479215))
                Line((-302.968331247, 89.163479215), (-299.528848369, 97.762186411))
                Line((-299.528848369, 97.762186411), (-304.528848369, 97.762186411))
                Line((-304.528848369, 97.762186411), (-307.968331247, 89.163479215))
                ThreePointArc((-307.968331247, 89.163479215), (-307.862289593, 88.223229496), (-307.019910035, 87.792287451))
                Line((-307.019910035, 87.792287451), (-302.457129047, 87.883308038))
            make_face()
        extrude(amount=MOVE_FACE2_2_DEPTH)

    # Fillet23
    fillet23_edges = [part.edges().sort_by_distance(p)[0] for p in [
        (-14.801436578, 121.284938536, 6.35),
        (21.198563422, 121.284938536, 6.35),
    ]]
    fillet(fillet23_edges, radius=FILLET23_R)

    # Sketch25 → 1/4 Clearance Hole1 (revolve, cut)
    with SkipClean():  # the faces are left unmerged after this step: merging them gives an invalid solid
        with BuildSketch(Plane(origin=(-230.349490795, 83.14300879, 0), x_dir=(0, 1, 0), z_dir=(1, 0, 0))):
            with Locations((1.63195, 6.35)):
                Rectangle(SKETCH25_W, SKETCH25_H)
        f_1_4_clearance_hole1 = revolve(axis=Axis((-230.349490795, 83.14300879, -6.35), (0, 0, 1)), mode=Mode.SUBTRACT)

    # 1/4 Clearance Hole1 at 2: 1/4 Clearance Hole1 ×2
    with SkipClean():  # the faces are left unmerged after this step: merging them gives an invalid solid
        with Locations(*[Vector(-0.9953328324267502, -0.09650156834654611, 0) * (i * F_1_4_CLEARANCE_HOLE1_AT_2_PITCH) for i in range(1, F_1_4_CLEARANCE_HOLE1_AT_2_COUNT)]):
            add(f_1_4_clearance_hole1, mode=Mode.SUBTRACT)

    # 1/4 Clearance Hole1 at 3: 1/4 Clearance Hole1 ×2
    with SkipClean():  # the faces are left unmerged after this step: merging them gives an invalid solid
        with Locations(*[Vector(-0.9982710863910461, -0.058777870628668454, 0) * (i * F_1_4_CLEARANCE_HOLE1_AT_3_PITCH) for i in range(1, F_1_4_CLEARANCE_HOLE1_AT_3_COUNT)]):
            add(f_1_4_clearance_hole1, mode=Mode.SUBTRACT)

    # 1/4 Clearance Hole1 at 4: 1/4 Clearance Hole1 ×2
    with SkipClean():  # the faces are left unmerged after this step: merging them gives an invalid solid
        with Locations(*[Vector(0.9916342432612381, 0.12907953978734113, 0) * (i * F_1_4_CLEARANCE_HOLE1_AT_4_PITCH) for i in range(1, F_1_4_CLEARANCE_HOLE1_AT_4_COUNT)]):
            add(f_1_4_clearance_hole1, mode=Mode.SUBTRACT)

    # 1/4 Clearance Hole1 at 5: 1/4 Clearance Hole1 ×2
    with SkipClean():  # the faces are left unmerged after this step: merging them gives an invalid solid
        with Locations(*[Vector(0.9916342432612381, 0.12907953978734119, 0) * (i * F_1_4_CLEARANCE_HOLE1_AT_5_PITCH) for i in range(1, F_1_4_CLEARANCE_HOLE1_AT_5_COUNT)]):
            add(f_1_4_clearance_hole1, mode=Mode.SUBTRACT)

    # 1/4 Clearance Hole1 at 6: 1/4 Clearance Hole1 ×2
    with SkipClean():  # the faces are left unmerged after this step: merging them gives an invalid solid
        with Locations(*[Vector(0.9916342432612381, 0.1290795397873412, 0) * (i * F_1_4_CLEARANCE_HOLE1_AT_6_PITCH) for i in range(1, F_1_4_CLEARANCE_HOLE1_AT_6_COUNT)]):
            add(f_1_4_clearance_hole1, mode=Mode.SUBTRACT)

    # 1/4 Clearance Hole1 at 7: 1/4 Clearance Hole1 ×2
    with SkipClean():  # the faces are left unmerged after this step: merging them gives an invalid solid
        with Locations(*[Vector(0.9916342432612381, 0.12907953978734105, 0) * (i * F_1_4_CLEARANCE_HOLE1_AT_7_PITCH) for i in range(1, F_1_4_CLEARANCE_HOLE1_AT_7_COUNT)]):
            add(f_1_4_clearance_hole1, mode=Mode.SUBTRACT)


with BuildPart() as body_2:
    # Sketch19 → Boss-Extrude7 (new body)
    with BuildSketch(Plane(origin=(0, 0, 0), x_dir=(-1, 0, 0), z_dir=(0, 0, -1))):
        with BuildLine():
            Line((124.18275106, 71.243164539), (176.715153171, 70.867181128))
            ThreePointArc((176.715153171, 70.867181128), (184.899057561, 75.669944516), (184.561210792, 85.153018214))
            Line((184.561210792, 85.153018214), (149.054349601, 140.12829873))
            Line((149.054349601, 140.12829873), (162.836097859, 190.12829873))
            Line((162.836097859, 190.12829873), (144.420262397, 190.12829873))
            Line((144.420262397, 190.12829873), (114.999474247, 83.390069305))
            ThreePointArc((114.999474247, 83.390069305), (116.596017391, 75.052271444), (124.18275106, 71.243164539))
        make_face()
        with Locations(Location((124.251436578, 80.83990499, 0), (0, 0, 180))):
            Circle(SKETCH19_R, mode=Mode.SUBTRACT)
        with Locations(Location((176.781436578, 80.12829873, 0), (0, 0, 180))):
            Circle(SKETCH19_R, mode=Mode.SUBTRACT)
        with Locations(Location((159.271436578, 80.365500817, 0), (0, 0, 180))):
            Circle(SKETCH19_R, mode=Mode.SUBTRACT)
        with Locations(Location((141.761436578, 80.602702904, 0), (0, 0, 180))):
            Circle(SKETCH19_R, mode=Mode.SUBTRACT)
    extrude(amount=BOSS_EXTRUDE7_DEPTH)

    # Fillet17
    fillet17_edges = [body_2.edges().sort_by_distance(p)[0] for p in [
        (-149.054349601, 140.12829873, -3.175),
    ]]
    fillet(fillet17_edges, radius=FILLET17_R)

    # Fillet18
    fillet18_edges = [body_2.edges().sort_by_distance(p)[0] for p in [
        (-144.420262397, 190.12829873, -3.175),
        (-162.836097859, 190.12829873, -3.175),
    ]]
    fillet(fillet18_edges, radius=FILLET18_R)

    # Sketch20 → Cut-Extrude11 (cut, through all)
    with BuildSketch(Plane(origin=(0, 0, -6.35), x_dir=(-1, 0, 0), z_dir=(0, 0, -1))):
        Polygon((164.044210392, 92.958432708), (140.969247478, 128.685402552), (131.186466054, 93.193601219), align=None)
    extrude(amount=-CUT_EXTRUDE11_DEPTH, mode=Mode.SUBTRACT)

    # Fillet19
    fillet19_edges = [body_2.edges().sort_by_distance(p)[0] for p in [
        (-131.186466054, 93.193601219, -3.175),
        (-140.969247478, 128.685402552, -3.175),
        (-164.044210392, 92.958432708, -3.175),
    ]]
    fillet(fillet19_edges, radius=FILLET19_R)


with BuildPart() as body_2_2:
    # Body-Move/Copy1 outline → Body-Move/Copy1 (new body)
    with BuildSketch(Plane.XY):
        with BuildLine():
            Line((15.283279266, 94.221749158), (13.209430329, 94.180379005))
            ThreePointArc((13.209430329, 94.180379005), (11.488793028, 95.095967672), (11.364402404, 97.041069803))
            ThreePointArc((11.364402404, 97.041069803), (7.820925157, 108.454043732), (-3.83483588, 105.816726997))
            ThreePointArc((-3.83483588, 105.816726997), (-5.628834916, 102.889186644), (-7.106994943, 99.790159701))
            ThreePointArc((-7.106994943, 99.790159701), (-7.671727903, 97.779168258), (-7.746735366, 95.691733522))
            ThreePointArc((-7.746735366, 95.691733522), (-8.24962771, 94.192022343), (-9.684666066, 93.526665861))
            Line((-9.684666066, 93.526665861), (-28.684666066, 93.002231288))
            Line((-28.684666066, 93.002231288), (-45.850065454, 93.002231288))
            Line((-45.850065454, 93.002231288), (-307.019910035, 87.792287451))
            ThreePointArc((-307.019910035, 87.792287451), (-307.862289593, 88.223229496), (-307.968331247, 89.163479215))
            Line((-307.968331247, 89.163479215), (-304.528848369, 97.762186411))
            Line((-304.528848369, 97.762186411), (-311.898250791, 97.762186411))
            ThreePointArc((-311.898250791, 97.762186411), (-312.49966239, 97.669620312), (-313.045403664, 97.400490499))
            Line((-313.045403664, 97.400490499), (-356.801436578, 66.762186411))
            Line((-356.801436578, 66.762186411), (-341.101436578, 66.762186411))
            Line((-341.101436578, 66.762186411), (-331.101436578, 68.762186411))
            Line((-331.101436578, 68.762186411), (13.393331634, 71.227794543))
            ThreePointArc((13.393331634, 71.227794543), (17.964357879, 71.9756473), (22.089304342, 74.082393927))
            Line((22.089304342, 74.082393927), (29.067448443, 79.140508783))
            ThreePointArc((29.067448443, 79.140508783), (30.999575384, 93.493719985), (16.569252423, 94.723990514))
            ThreePointArc((16.569252423, 94.723990514), (15.970975757, 94.358391515), (15.283279266, 94.221749158))
        make_face()
        with Locations((-299.351436578, 78.467884124)):
            Circle(BODY_MOVE_COPY1_OUTLINE_R, mode=Mode.SUBTRACT)
        with Locations((-281.841436578, 78.705086211)):
            Circle(BODY_MOVE_COPY1_OUTLINE_R, mode=Mode.SUBTRACT)
        with Locations((-264.331436578, 78.942288297)):
            Circle(BODY_MOVE_COPY1_OUTLINE_R, mode=Mode.SUBTRACT)
        with Locations((-246.821436578, 79.179490384)):
            Circle(BODY_MOVE_COPY1_OUTLINE_R, mode=Mode.SUBTRACT)
        with Locations((-229.311436578, 79.41669247)):
            Circle(BODY_MOVE_COPY1_OUTLINE_R, mode=Mode.SUBTRACT)
        with Locations((-211.801436578, 79.653894557)):
            Circle(BODY_MOVE_COPY1_OUTLINE_R, mode=Mode.SUBTRACT)
        with Locations((-194.291436578, 79.891096644)):
            Circle(BODY_MOVE_COPY1_OUTLINE_R, mode=Mode.SUBTRACT)
        with Locations((-176.781436578, 80.12829873)):
            Circle(BODY_MOVE_COPY1_OUTLINE_R, mode=Mode.SUBTRACT)
        with Locations((-159.271436578, 80.365500817)):
            Circle(BODY_MOVE_COPY1_OUTLINE_R, mode=Mode.SUBTRACT)
        with Locations((-141.761436578, 80.602702904)):
            Circle(BODY_MOVE_COPY1_OUTLINE_R, mode=Mode.SUBTRACT)
        with Locations((-124.251436578, 80.83990499)):
            Circle(BODY_MOVE_COPY1_OUTLINE_R, mode=Mode.SUBTRACT)
        with Locations((-106.743043005, 81.077085315)):
            Circle(BODY_MOVE_COPY1_OUTLINE_R, mode=Mode.SUBTRACT)
        with Locations((-89.234649432, 81.31426564)):
            Circle(BODY_MOVE_COPY1_OUTLINE_R, mode=Mode.SUBTRACT)
        with Locations((-71.724649432, 81.551467727)):
            Circle(BODY_MOVE_COPY1_OUTLINE_R, mode=Mode.SUBTRACT)
        with Locations((23.198563422, 87.237186411)):
            Circle(BODY_MOVE_COPY1_OUTLINE_R_2, mode=Mode.SUBTRACT)
        with BuildLine():
            ThreePointArc((7.784884797, 97.957620066), (6.596179451, 95.696523567), (5.465617428, 93.405801564))
            ThreePointArc((5.465617428, 93.405801564), (-1.654971454, 90.99120453), (-3.886898551, 98.171146472))
            ThreePointArc((-3.886898551, 98.171146472), (-2.698193205, 100.432242972), (-1.567631182, 102.722964975))
            ThreePointArc((-1.567631182, 102.722964975), (5.5529577, 105.137562008), (7.784884797, 97.957620066))
        make_face(mode=Mode.SUBTRACT)
    extrude(amount=BODY_MOVE_COPY1_DEPTH)


solid = Compound([part.part, body_2_2.part])
